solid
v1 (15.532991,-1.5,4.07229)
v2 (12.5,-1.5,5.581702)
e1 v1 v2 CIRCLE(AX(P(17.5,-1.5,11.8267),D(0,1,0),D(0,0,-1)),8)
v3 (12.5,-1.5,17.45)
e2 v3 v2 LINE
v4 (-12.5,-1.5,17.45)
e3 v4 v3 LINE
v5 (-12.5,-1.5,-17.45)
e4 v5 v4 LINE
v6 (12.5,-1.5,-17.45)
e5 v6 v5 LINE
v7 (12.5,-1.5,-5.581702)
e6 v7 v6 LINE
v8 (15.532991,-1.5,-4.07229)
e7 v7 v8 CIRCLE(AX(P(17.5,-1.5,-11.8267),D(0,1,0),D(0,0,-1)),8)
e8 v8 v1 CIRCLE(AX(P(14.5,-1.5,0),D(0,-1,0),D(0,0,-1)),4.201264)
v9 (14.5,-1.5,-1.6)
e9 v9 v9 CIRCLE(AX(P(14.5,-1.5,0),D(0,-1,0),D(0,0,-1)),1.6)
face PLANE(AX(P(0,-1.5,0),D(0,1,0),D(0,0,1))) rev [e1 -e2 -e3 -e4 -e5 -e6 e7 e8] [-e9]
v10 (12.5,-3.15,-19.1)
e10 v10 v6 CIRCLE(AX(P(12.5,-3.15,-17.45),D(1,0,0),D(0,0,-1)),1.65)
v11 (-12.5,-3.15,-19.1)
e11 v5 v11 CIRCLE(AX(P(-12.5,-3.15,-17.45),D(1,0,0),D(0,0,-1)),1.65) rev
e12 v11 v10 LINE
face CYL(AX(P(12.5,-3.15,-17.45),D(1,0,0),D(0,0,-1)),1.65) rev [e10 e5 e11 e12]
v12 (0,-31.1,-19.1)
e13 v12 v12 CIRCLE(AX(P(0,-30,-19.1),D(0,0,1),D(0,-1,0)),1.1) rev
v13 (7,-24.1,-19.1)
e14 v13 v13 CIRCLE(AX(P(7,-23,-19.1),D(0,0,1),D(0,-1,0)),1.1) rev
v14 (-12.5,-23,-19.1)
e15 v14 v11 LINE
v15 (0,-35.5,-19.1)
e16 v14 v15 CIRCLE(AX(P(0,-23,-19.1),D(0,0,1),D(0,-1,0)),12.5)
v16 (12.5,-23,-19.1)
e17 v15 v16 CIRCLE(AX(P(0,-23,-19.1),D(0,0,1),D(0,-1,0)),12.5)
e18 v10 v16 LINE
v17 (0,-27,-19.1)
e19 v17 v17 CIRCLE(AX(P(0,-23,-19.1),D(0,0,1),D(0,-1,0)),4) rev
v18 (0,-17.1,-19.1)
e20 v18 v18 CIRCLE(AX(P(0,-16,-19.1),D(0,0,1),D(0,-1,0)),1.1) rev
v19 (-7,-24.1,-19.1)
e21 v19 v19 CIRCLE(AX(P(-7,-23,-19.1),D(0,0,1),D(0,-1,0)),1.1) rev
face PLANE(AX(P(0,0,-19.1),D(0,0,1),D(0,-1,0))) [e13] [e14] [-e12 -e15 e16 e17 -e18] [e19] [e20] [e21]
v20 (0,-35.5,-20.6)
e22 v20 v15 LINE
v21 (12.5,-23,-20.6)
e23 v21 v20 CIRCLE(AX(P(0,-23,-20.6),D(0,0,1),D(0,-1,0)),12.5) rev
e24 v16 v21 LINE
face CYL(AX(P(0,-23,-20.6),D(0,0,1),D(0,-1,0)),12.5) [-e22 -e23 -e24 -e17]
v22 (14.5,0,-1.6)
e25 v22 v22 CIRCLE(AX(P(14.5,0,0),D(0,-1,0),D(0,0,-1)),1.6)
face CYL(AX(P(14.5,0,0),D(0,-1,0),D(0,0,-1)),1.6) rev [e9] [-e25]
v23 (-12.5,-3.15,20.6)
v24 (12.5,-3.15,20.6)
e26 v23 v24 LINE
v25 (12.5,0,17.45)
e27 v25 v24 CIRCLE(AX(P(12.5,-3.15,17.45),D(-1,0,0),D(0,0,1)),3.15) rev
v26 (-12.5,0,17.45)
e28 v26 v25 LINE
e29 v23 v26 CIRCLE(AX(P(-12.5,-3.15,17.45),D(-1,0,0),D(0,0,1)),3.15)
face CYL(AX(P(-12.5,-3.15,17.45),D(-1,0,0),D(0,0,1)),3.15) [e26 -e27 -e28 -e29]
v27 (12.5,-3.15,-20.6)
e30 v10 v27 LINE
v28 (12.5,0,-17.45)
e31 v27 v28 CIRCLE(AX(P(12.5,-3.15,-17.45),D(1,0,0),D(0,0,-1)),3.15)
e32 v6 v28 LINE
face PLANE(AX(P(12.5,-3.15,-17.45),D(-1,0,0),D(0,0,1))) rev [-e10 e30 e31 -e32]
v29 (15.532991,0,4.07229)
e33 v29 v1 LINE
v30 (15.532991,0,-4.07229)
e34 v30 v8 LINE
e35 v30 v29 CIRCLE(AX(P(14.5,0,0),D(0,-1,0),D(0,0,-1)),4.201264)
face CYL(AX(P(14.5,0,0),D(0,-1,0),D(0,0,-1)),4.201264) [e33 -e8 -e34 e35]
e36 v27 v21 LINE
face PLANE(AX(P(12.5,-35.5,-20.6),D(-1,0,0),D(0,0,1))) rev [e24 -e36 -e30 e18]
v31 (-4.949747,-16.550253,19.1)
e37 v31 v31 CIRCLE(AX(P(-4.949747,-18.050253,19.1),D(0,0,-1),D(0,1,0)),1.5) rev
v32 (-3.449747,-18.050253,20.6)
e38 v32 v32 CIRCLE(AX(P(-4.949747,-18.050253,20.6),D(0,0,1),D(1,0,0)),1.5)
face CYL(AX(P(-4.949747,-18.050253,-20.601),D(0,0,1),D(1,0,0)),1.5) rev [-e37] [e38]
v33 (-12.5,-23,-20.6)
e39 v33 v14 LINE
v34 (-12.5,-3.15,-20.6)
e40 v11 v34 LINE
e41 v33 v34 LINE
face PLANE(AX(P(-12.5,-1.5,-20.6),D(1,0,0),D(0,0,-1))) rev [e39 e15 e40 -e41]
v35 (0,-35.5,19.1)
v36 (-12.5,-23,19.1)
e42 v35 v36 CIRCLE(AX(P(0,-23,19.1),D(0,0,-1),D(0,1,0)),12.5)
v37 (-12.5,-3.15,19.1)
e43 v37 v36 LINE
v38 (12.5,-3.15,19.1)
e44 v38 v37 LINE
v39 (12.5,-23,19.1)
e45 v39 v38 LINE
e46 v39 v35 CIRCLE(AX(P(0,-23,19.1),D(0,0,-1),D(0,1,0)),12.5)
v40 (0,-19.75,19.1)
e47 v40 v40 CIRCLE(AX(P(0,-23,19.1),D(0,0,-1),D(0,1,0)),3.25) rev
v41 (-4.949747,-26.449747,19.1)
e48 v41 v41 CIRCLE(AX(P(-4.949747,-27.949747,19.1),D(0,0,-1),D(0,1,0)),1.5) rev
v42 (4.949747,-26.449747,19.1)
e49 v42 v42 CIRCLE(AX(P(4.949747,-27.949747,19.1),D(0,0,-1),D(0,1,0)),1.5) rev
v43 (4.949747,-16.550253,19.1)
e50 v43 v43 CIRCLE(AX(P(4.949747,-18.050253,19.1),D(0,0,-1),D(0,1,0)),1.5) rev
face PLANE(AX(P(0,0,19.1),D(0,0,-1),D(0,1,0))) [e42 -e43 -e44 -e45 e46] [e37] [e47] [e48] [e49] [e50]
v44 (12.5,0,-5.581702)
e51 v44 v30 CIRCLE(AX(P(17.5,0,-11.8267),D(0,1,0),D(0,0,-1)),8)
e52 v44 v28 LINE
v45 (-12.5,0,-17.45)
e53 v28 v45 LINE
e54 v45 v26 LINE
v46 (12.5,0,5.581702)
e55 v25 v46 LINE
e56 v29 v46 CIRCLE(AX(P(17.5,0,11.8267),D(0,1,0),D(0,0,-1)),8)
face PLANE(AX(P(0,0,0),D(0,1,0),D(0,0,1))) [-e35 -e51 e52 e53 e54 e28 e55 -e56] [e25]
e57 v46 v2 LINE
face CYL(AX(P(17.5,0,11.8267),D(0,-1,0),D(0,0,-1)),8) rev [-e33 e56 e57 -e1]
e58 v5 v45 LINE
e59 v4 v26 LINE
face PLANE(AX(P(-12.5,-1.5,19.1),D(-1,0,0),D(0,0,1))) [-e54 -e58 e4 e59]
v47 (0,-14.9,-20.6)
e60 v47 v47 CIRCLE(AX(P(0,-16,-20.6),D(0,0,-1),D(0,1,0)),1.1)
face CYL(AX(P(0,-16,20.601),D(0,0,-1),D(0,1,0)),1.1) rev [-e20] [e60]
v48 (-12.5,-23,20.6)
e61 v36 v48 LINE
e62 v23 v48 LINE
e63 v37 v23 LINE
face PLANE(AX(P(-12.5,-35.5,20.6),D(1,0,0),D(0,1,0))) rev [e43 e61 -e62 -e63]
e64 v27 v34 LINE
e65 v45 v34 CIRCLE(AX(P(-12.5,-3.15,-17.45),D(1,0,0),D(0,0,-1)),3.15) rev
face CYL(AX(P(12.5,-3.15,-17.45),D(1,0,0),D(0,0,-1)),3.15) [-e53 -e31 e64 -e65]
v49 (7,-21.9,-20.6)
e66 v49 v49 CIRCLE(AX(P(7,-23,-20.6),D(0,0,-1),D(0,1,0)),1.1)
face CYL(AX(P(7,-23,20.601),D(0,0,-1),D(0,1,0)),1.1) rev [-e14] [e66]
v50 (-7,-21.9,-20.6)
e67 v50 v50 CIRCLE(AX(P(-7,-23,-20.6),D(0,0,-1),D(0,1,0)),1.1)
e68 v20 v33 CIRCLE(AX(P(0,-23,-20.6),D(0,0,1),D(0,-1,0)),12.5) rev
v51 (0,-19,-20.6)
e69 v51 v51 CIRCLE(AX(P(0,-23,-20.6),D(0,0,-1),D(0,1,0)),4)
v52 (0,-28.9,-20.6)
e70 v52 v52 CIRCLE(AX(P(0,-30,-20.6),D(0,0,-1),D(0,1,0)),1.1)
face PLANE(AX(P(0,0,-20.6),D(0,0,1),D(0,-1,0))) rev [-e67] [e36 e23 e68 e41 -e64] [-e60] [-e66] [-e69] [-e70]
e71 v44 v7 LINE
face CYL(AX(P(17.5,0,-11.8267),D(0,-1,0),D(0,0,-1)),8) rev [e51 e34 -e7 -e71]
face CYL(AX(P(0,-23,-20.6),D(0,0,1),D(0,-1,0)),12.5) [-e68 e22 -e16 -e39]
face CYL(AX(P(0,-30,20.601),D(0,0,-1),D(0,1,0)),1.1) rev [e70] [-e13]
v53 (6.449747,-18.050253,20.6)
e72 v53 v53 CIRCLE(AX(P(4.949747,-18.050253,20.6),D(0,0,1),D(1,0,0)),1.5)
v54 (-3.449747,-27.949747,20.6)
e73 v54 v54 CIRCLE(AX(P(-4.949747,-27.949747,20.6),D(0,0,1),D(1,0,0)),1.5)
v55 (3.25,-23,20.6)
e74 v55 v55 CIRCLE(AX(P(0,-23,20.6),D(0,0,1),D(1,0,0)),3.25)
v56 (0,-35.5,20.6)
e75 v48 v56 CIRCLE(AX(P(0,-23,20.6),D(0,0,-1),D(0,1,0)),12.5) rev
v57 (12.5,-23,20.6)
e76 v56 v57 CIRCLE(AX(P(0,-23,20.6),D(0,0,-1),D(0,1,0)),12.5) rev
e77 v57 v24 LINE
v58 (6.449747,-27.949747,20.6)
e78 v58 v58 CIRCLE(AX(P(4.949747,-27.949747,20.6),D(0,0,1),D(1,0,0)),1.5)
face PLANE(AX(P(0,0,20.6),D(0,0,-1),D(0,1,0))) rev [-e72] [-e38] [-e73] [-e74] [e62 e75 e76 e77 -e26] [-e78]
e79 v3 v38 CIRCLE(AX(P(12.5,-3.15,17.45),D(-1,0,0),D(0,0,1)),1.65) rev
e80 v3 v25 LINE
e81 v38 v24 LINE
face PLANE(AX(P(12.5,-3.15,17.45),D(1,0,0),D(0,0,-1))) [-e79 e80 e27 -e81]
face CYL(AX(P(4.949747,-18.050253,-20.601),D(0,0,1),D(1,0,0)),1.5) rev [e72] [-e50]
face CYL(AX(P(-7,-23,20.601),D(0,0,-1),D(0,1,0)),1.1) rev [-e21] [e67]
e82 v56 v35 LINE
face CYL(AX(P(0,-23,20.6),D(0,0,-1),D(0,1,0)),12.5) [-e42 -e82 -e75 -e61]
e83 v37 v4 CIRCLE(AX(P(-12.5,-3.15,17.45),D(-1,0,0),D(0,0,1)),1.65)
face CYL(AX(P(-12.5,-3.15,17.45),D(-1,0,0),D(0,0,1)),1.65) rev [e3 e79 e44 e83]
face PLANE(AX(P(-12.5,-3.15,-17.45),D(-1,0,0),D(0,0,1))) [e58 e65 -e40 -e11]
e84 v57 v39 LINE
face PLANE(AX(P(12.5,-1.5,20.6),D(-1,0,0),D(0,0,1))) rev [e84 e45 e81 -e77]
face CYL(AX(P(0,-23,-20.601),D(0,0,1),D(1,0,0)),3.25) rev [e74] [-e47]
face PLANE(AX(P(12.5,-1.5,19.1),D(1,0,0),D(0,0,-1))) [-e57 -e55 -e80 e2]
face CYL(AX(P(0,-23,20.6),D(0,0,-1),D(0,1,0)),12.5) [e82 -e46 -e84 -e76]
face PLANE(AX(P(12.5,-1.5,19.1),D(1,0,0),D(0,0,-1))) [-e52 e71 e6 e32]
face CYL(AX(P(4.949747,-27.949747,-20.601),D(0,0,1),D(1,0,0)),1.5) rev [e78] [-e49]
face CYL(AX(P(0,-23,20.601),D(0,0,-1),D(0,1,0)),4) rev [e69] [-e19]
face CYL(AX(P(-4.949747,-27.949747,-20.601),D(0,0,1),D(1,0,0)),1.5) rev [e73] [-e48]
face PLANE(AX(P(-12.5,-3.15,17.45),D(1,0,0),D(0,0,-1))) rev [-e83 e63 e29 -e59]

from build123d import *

# Parameters (mm, degrees)
SKETCH1_W                      = 25
SKETCH1_H                      = 38.2
BASE_FLANGE1_DEPTH             = 1.5
EDGE_FLANGE1_STRIP_W           = 9.3
EDGE_FLANGE1_STRIP_H           = 1.5
EDGE_FLANGE1_STRIP_CUT_DEPTH   = 25
EDGE_FLANGE1_STRIP_2_W         = 9.3
EDGE_FLANGE1_STRIP_2_H         = 1.5
EDGE_FLANGE1_STRIP_CUT_2_DEPTH = 25
EDGE_FLANGE1_DEPTH             = 25
EDGE_FLANGE1_BEND_DEPTH        = 25
CUT_EXTRUDE1_REACH             = 57.803
SKETCH12_R                     = 1.5
SKETCH12_R_2                   = 3.25
CUT_EXTRUDE2_REACH             = 57.803
SKETCH13_R                     = 4
SKETCH13_R_2                   = 1.1
FILLET1_R                      = 12.5
SKETCH14_R                     = 1.6
TAB1_DEPTH                     = 1.5


# Sheet-metal steps are written as plain solids
with BuildPart() as part:
    # Sketch1 → Base-Flange1 (new body)
    with BuildSketch(Plane(origin=(0, 0, 0), x_dir=(1, 0, 0), z_dir=(0, 1, 0))):
        Rectangle(SKETCH1_W, SKETCH1_H)
    extrude(amount=-BASE_FLANGE1_DEPTH)

    # Edge-Flange1 strip (across the edge) → Edge-Flange1 strip cut (cut)
    with BuildSketch(Plane(origin=(12.5, -1.5, 19.1), x_dir=(0, 0, -1), z_dir=(-1, 0, 0))):
        with Locations((-3, -0.75)):
            Rectangle(EDGE_FLANGE1_STRIP_W, EDGE_FLANGE1_STRIP_H)
    extrude(amount=EDGE_FLANGE1_STRIP_CUT_DEPTH, mode=Mode.SUBTRACT)

    # Edge-Flange1 strip 2 (across the edge) → Edge-Flange1 strip cut 2 (cut)
    with BuildSketch(Plane(origin=(-12.5, -1.5, -19.1), x_dir=(0, 0, 1), z_dir=(1, 0, 0))):
        with Locations((-3, -0.75)):
            Rectangle(EDGE_FLANGE1_STRIP_2_W, EDGE_FLANGE1_STRIP_2_H)
    extrude(amount=EDGE_FLANGE1_STRIP_CUT_2_DEPTH, mode=Mode.SUBTRACT)

    # Edge-Flange1 section (across the edge) → Edge-Flange1 (add)
    with BuildSketch(Plane(origin=(12.5, -1.5, 19.1), x_dir=(0, 0, -1), z_dir=(-1, 0, 0))):
        with BuildLine():
            Line((-1.5, 1.65), (-1.5, 34))
            Line((-1.5, 34), (0, 34))
            Line((0, 34), (0, 1.65))
            ThreePointArc((0, 1.65), (0.483273811, 0.483273811), (1.65, 0))
            Line((1.65, 0), (1.65, -1.5))
            ThreePointArc((1.65, -1.5), (-0.577386361, -0.577386361), (-1.5, 1.65))
        make_face()
    extrude(amount=EDGE_FLANGE1_DEPTH)

    # Edge-Flange1 section 2 (across the edge) → Edge-Flange1 bend (add)
    with BuildSketch(Plane(origin=(-12.5, -1.5, -19.1), x_dir=(0, 0, 1), z_dir=(1, 0, 0))):
        with BuildLine():
            Line((-1.5, 1.65), (-1.5, 34))
            Line((-1.5, 34), (0, 34))
            Line((0, 34), (0, 1.65))
            ThreePointArc((0, 1.65), (0.483273811, 0.483273811), (1.65, 0))
            Line((1.65, 0), (1.65, -1.5))
            ThreePointArc((1.65, -1.5), (-0.577386361, -0.577386361), (-1.5, 1.65))
        make_face()
    extrude(amount=EDGE_FLANGE1_BEND_DEPTH)

    # Sketch12 → Cut-Extrude1 (cut, up to next)
    with BuildSketch(Plane.XY.offset(20.6), mode=Mode.PRIVATE) as cut_extrude1_sk1:
        with Locations((-4.949747468, -18.050252532)):
            Circle(SKETCH12_R)
    cut_extrude1_tool1 = extrude(cut_extrude1_sk1.sketch, amount=-CUT_EXTRUDE1_REACH, mode=Mode.PRIVATE) & part.part
    # Sketch12 → Cut-Extrude1 (cut, up to next)
    with BuildSketch(Plane.XY.offset(20.6), mode=Mode.PRIVATE) as cut_extrude1_sk2:
        with Locations((4.949747468, -18.050252532)):
            Circle(SKETCH12_R)
    cut_extrude1_tool2 = extrude(cut_extrude1_sk2.sketch, amount=-CUT_EXTRUDE1_REACH, mode=Mode.PRIVATE) & part.part
    # Sketch12 → Cut-Extrude1 (cut, up to next)
    with BuildSketch(Plane.XY.offset(20.6), mode=Mode.PRIVATE) as cut_extrude1_sk3:
        with Locations((-4.949747468, -27.949747468)):
            Circle(SKETCH12_R)
    cut_extrude1_tool3 = extrude(cut_extrude1_sk3.sketch, amount=-CUT_EXTRUDE1_REACH, mode=Mode.PRIVATE) & part.part
    # Sketch12 → Cut-Extrude1 (cut, up to next)
    with BuildSketch(Plane.XY.offset(20.6), mode=Mode.PRIVATE) as cut_extrude1_sk4:
        with Locations((4.949747468, -27.949747468)):
            Circle(SKETCH12_R)
    cut_extrude1_tool4 = extrude(cut_extrude1_sk4.sketch, amount=-CUT_EXTRUDE1_REACH, mode=Mode.PRIVATE) & part.part
    # Sketch12 → Cut-Extrude1 (cut, up to next)
    with BuildSketch(Plane.XY.offset(20.6), mode=Mode.PRIVATE) as cut_extrude1_sk5:
        with Locations((0, -23)):
            Circle(SKETCH12_R_2)
    cut_extrude1_tool5 = extrude(cut_extrude1_sk5.sketch, amount=-CUT_EXTRUDE1_REACH, mode=Mode.PRIVATE) & part.part
    add(cut_extrude1_tool1.solids().sort_by_distance((-4.949747, -18.050253, 20.6))[0], mode=Mode.SUBTRACT)
    add(cut_extrude1_tool2.solids().sort_by_distance((4.949747, -18.050253, 20.6))[0], mode=Mode.SUBTRACT)
    add(cut_extrude1_tool3.solids().sort_by_distance((-4.949747, -27.949747, 20.6))[0], mode=Mode.SUBTRACT)
    add(cut_extrude1_tool4.solids().sort_by_distance((4.949747, -27.949747, 20.6))[0], mode=Mode.SUBTRACT)
    add(cut_extrude1_tool5.solids().sort_by_distance((0, -23, 20.6))[0], mode=Mode.SUBTRACT)

    # Sketch13 → Cut-Extrude2 (cut, up to next)
    with BuildSketch(Plane(origin=(0, 0, -20.6), x_dir=(-1, 0, 0), z_dir=(0, 0, -1)), mode=Mode.PRIVATE) as cut_extrude2_sk1:
        with Locations(Location((0, -23, 0), (0, 0, 90))):
            Circle(SKETCH13_R)
    cut_extrude2_tool1 = extrude(cut_extrude2_sk1.sketch, amount=-CUT_EXTRUDE2_REACH, mode=Mode.PRIVATE) & part.part
    # Sketch13 → Cut-Extrude2 (cut, up to next)
    with BuildSketch(Plane(origin=(0, 0, -20.6), x_dir=(-1, 0, 0), z_dir=(0, 0, -1)), mode=Mode.PRIVATE) as cut_extrude2_sk2:
        with Locations(Location((0, -30, 0), (0, 0, 90))):
            Circle(SKETCH13_R_2)
    cut_extrude2_tool2 = extrude(cut_extrude2_sk2.sketch, amount=-CUT_EXTRUDE2_REACH, mode=Mode.PRIVATE) & part.part
    # Sketch13 → Cut-Extrude2 (cut, up to next)
    with BuildSketch(Plane(origin=(0, 0, -20.6), x_dir=(-1, 0, 0), z_dir=(0, 0, -1)), mode=Mode.PRIVATE) as cut_extrude2_sk3:
        with Locations(Location((-7, -23, 0), (0, 0, 90))):
            Circle(SKETCH13_R_2)
    cut_extrude2_tool3 = extrude(cut_extrude2_sk3.sketch, amount=-CUT_EXTRUDE2_REACH, mode=Mode.PRIVATE) & part.part
    # Sketch13 → Cut-Extrude2 (cut, up to next)
    with BuildSketch(Plane(origin=(0, 0, -20.6), x_dir=(-1, 0, 0), z_dir=(0, 0, -1)), mode=Mode.PRIVATE) as cut_extrude2_sk4:
        with Locations(Location((0, -16, 0), (0, 0, 90))):
            Circle(SKETCH13_R_2)
    cut_extrude2_tool4 = extrude(cut_extrude2_sk4.sketch, amount=-CUT_EXTRUDE2_REACH, mode=Mode.PRIVATE) & part.part
    # Sketch13 → Cut-Extrude2 (cut, up to next)
    with BuildSketch(Plane(origin=(0, 0, -20.6), x_dir=(-1, 0, 0), z_dir=(0, 0, -1)), mode=Mode.PRIVATE) as cut_extrude2_sk5:
        with Locations(Location((7, -23, 0), (0, 0, 90))):
            Circle(SKETCH13_R_2)
    cut_extrude2_tool5 = extrude(cut_extrude2_sk5.sketch, amount=-CUT_EXTRUDE2_REACH, mode=Mode.PRIVATE) & part.part
    add(cut_extrude2_tool1.solids().sort_by_distance((0, -23, -20.6))[0], mode=Mode.SUBTRACT)
    add(cut_extrude2_tool2.solids().sort_by_distance((0, -30, -20.6))[0], mode=Mode.SUBTRACT)
    add(cut_extrude2_tool3.solids().sort_by_distance((7, -23, -20.6))[0], mode=Mode.SUBTRACT)
    add(cut_extrude2_tool4.solids().sort_by_distance((0, -16, -20.6))[0], mode=Mode.SUBTRACT)
    add(cut_extrude2_tool5.solids().sort_by_distance((-7, -23, -20.6))[0], mode=Mode.SUBTRACT)

    # Fillet1
    fillet1_edges = [part.edges().sort_by_distance(p)[0] for p in [
        (12.5, -35.5, 19.85),
        (-12.5, -35.5, 19.85),
        (-12.5, -35.5, -19.85),
        (12.5, -35.5, -19.85),
    ]]
    fillet(fillet1_edges, radius=FILLET1_R - 0.0001)  # a hair under: the kernel refuses the full size

    # Sketch14 → Tab1 (add)
    with BuildSketch(Plane.XZ.offset(1.5)):
        with BuildLine():
            Line((12.5, -5.581701947), (12.5, 5.581701947))
            ThreePointArc((12.5, 5.581701947), (13.935678731, 4.66460431), (15.532990604, 4.072289972))
            ThreePointArc((15.532990604, 4.072289972), (18.701263524, 0), (15.532990604, -4.072289972))
            ThreePointArc((15.532990604, -4.072289972), (13.935678731, -4.66460431), (12.5, -5.581701947))
        make_face()
        with Locations(Location((14.5, 0, 0), (0, 0, 270))):
            Circle(SKETCH14_R, mode=Mode.SUBTRACT)
    extrude(amount=-TAB1_DEPTH)


solid = part.part
